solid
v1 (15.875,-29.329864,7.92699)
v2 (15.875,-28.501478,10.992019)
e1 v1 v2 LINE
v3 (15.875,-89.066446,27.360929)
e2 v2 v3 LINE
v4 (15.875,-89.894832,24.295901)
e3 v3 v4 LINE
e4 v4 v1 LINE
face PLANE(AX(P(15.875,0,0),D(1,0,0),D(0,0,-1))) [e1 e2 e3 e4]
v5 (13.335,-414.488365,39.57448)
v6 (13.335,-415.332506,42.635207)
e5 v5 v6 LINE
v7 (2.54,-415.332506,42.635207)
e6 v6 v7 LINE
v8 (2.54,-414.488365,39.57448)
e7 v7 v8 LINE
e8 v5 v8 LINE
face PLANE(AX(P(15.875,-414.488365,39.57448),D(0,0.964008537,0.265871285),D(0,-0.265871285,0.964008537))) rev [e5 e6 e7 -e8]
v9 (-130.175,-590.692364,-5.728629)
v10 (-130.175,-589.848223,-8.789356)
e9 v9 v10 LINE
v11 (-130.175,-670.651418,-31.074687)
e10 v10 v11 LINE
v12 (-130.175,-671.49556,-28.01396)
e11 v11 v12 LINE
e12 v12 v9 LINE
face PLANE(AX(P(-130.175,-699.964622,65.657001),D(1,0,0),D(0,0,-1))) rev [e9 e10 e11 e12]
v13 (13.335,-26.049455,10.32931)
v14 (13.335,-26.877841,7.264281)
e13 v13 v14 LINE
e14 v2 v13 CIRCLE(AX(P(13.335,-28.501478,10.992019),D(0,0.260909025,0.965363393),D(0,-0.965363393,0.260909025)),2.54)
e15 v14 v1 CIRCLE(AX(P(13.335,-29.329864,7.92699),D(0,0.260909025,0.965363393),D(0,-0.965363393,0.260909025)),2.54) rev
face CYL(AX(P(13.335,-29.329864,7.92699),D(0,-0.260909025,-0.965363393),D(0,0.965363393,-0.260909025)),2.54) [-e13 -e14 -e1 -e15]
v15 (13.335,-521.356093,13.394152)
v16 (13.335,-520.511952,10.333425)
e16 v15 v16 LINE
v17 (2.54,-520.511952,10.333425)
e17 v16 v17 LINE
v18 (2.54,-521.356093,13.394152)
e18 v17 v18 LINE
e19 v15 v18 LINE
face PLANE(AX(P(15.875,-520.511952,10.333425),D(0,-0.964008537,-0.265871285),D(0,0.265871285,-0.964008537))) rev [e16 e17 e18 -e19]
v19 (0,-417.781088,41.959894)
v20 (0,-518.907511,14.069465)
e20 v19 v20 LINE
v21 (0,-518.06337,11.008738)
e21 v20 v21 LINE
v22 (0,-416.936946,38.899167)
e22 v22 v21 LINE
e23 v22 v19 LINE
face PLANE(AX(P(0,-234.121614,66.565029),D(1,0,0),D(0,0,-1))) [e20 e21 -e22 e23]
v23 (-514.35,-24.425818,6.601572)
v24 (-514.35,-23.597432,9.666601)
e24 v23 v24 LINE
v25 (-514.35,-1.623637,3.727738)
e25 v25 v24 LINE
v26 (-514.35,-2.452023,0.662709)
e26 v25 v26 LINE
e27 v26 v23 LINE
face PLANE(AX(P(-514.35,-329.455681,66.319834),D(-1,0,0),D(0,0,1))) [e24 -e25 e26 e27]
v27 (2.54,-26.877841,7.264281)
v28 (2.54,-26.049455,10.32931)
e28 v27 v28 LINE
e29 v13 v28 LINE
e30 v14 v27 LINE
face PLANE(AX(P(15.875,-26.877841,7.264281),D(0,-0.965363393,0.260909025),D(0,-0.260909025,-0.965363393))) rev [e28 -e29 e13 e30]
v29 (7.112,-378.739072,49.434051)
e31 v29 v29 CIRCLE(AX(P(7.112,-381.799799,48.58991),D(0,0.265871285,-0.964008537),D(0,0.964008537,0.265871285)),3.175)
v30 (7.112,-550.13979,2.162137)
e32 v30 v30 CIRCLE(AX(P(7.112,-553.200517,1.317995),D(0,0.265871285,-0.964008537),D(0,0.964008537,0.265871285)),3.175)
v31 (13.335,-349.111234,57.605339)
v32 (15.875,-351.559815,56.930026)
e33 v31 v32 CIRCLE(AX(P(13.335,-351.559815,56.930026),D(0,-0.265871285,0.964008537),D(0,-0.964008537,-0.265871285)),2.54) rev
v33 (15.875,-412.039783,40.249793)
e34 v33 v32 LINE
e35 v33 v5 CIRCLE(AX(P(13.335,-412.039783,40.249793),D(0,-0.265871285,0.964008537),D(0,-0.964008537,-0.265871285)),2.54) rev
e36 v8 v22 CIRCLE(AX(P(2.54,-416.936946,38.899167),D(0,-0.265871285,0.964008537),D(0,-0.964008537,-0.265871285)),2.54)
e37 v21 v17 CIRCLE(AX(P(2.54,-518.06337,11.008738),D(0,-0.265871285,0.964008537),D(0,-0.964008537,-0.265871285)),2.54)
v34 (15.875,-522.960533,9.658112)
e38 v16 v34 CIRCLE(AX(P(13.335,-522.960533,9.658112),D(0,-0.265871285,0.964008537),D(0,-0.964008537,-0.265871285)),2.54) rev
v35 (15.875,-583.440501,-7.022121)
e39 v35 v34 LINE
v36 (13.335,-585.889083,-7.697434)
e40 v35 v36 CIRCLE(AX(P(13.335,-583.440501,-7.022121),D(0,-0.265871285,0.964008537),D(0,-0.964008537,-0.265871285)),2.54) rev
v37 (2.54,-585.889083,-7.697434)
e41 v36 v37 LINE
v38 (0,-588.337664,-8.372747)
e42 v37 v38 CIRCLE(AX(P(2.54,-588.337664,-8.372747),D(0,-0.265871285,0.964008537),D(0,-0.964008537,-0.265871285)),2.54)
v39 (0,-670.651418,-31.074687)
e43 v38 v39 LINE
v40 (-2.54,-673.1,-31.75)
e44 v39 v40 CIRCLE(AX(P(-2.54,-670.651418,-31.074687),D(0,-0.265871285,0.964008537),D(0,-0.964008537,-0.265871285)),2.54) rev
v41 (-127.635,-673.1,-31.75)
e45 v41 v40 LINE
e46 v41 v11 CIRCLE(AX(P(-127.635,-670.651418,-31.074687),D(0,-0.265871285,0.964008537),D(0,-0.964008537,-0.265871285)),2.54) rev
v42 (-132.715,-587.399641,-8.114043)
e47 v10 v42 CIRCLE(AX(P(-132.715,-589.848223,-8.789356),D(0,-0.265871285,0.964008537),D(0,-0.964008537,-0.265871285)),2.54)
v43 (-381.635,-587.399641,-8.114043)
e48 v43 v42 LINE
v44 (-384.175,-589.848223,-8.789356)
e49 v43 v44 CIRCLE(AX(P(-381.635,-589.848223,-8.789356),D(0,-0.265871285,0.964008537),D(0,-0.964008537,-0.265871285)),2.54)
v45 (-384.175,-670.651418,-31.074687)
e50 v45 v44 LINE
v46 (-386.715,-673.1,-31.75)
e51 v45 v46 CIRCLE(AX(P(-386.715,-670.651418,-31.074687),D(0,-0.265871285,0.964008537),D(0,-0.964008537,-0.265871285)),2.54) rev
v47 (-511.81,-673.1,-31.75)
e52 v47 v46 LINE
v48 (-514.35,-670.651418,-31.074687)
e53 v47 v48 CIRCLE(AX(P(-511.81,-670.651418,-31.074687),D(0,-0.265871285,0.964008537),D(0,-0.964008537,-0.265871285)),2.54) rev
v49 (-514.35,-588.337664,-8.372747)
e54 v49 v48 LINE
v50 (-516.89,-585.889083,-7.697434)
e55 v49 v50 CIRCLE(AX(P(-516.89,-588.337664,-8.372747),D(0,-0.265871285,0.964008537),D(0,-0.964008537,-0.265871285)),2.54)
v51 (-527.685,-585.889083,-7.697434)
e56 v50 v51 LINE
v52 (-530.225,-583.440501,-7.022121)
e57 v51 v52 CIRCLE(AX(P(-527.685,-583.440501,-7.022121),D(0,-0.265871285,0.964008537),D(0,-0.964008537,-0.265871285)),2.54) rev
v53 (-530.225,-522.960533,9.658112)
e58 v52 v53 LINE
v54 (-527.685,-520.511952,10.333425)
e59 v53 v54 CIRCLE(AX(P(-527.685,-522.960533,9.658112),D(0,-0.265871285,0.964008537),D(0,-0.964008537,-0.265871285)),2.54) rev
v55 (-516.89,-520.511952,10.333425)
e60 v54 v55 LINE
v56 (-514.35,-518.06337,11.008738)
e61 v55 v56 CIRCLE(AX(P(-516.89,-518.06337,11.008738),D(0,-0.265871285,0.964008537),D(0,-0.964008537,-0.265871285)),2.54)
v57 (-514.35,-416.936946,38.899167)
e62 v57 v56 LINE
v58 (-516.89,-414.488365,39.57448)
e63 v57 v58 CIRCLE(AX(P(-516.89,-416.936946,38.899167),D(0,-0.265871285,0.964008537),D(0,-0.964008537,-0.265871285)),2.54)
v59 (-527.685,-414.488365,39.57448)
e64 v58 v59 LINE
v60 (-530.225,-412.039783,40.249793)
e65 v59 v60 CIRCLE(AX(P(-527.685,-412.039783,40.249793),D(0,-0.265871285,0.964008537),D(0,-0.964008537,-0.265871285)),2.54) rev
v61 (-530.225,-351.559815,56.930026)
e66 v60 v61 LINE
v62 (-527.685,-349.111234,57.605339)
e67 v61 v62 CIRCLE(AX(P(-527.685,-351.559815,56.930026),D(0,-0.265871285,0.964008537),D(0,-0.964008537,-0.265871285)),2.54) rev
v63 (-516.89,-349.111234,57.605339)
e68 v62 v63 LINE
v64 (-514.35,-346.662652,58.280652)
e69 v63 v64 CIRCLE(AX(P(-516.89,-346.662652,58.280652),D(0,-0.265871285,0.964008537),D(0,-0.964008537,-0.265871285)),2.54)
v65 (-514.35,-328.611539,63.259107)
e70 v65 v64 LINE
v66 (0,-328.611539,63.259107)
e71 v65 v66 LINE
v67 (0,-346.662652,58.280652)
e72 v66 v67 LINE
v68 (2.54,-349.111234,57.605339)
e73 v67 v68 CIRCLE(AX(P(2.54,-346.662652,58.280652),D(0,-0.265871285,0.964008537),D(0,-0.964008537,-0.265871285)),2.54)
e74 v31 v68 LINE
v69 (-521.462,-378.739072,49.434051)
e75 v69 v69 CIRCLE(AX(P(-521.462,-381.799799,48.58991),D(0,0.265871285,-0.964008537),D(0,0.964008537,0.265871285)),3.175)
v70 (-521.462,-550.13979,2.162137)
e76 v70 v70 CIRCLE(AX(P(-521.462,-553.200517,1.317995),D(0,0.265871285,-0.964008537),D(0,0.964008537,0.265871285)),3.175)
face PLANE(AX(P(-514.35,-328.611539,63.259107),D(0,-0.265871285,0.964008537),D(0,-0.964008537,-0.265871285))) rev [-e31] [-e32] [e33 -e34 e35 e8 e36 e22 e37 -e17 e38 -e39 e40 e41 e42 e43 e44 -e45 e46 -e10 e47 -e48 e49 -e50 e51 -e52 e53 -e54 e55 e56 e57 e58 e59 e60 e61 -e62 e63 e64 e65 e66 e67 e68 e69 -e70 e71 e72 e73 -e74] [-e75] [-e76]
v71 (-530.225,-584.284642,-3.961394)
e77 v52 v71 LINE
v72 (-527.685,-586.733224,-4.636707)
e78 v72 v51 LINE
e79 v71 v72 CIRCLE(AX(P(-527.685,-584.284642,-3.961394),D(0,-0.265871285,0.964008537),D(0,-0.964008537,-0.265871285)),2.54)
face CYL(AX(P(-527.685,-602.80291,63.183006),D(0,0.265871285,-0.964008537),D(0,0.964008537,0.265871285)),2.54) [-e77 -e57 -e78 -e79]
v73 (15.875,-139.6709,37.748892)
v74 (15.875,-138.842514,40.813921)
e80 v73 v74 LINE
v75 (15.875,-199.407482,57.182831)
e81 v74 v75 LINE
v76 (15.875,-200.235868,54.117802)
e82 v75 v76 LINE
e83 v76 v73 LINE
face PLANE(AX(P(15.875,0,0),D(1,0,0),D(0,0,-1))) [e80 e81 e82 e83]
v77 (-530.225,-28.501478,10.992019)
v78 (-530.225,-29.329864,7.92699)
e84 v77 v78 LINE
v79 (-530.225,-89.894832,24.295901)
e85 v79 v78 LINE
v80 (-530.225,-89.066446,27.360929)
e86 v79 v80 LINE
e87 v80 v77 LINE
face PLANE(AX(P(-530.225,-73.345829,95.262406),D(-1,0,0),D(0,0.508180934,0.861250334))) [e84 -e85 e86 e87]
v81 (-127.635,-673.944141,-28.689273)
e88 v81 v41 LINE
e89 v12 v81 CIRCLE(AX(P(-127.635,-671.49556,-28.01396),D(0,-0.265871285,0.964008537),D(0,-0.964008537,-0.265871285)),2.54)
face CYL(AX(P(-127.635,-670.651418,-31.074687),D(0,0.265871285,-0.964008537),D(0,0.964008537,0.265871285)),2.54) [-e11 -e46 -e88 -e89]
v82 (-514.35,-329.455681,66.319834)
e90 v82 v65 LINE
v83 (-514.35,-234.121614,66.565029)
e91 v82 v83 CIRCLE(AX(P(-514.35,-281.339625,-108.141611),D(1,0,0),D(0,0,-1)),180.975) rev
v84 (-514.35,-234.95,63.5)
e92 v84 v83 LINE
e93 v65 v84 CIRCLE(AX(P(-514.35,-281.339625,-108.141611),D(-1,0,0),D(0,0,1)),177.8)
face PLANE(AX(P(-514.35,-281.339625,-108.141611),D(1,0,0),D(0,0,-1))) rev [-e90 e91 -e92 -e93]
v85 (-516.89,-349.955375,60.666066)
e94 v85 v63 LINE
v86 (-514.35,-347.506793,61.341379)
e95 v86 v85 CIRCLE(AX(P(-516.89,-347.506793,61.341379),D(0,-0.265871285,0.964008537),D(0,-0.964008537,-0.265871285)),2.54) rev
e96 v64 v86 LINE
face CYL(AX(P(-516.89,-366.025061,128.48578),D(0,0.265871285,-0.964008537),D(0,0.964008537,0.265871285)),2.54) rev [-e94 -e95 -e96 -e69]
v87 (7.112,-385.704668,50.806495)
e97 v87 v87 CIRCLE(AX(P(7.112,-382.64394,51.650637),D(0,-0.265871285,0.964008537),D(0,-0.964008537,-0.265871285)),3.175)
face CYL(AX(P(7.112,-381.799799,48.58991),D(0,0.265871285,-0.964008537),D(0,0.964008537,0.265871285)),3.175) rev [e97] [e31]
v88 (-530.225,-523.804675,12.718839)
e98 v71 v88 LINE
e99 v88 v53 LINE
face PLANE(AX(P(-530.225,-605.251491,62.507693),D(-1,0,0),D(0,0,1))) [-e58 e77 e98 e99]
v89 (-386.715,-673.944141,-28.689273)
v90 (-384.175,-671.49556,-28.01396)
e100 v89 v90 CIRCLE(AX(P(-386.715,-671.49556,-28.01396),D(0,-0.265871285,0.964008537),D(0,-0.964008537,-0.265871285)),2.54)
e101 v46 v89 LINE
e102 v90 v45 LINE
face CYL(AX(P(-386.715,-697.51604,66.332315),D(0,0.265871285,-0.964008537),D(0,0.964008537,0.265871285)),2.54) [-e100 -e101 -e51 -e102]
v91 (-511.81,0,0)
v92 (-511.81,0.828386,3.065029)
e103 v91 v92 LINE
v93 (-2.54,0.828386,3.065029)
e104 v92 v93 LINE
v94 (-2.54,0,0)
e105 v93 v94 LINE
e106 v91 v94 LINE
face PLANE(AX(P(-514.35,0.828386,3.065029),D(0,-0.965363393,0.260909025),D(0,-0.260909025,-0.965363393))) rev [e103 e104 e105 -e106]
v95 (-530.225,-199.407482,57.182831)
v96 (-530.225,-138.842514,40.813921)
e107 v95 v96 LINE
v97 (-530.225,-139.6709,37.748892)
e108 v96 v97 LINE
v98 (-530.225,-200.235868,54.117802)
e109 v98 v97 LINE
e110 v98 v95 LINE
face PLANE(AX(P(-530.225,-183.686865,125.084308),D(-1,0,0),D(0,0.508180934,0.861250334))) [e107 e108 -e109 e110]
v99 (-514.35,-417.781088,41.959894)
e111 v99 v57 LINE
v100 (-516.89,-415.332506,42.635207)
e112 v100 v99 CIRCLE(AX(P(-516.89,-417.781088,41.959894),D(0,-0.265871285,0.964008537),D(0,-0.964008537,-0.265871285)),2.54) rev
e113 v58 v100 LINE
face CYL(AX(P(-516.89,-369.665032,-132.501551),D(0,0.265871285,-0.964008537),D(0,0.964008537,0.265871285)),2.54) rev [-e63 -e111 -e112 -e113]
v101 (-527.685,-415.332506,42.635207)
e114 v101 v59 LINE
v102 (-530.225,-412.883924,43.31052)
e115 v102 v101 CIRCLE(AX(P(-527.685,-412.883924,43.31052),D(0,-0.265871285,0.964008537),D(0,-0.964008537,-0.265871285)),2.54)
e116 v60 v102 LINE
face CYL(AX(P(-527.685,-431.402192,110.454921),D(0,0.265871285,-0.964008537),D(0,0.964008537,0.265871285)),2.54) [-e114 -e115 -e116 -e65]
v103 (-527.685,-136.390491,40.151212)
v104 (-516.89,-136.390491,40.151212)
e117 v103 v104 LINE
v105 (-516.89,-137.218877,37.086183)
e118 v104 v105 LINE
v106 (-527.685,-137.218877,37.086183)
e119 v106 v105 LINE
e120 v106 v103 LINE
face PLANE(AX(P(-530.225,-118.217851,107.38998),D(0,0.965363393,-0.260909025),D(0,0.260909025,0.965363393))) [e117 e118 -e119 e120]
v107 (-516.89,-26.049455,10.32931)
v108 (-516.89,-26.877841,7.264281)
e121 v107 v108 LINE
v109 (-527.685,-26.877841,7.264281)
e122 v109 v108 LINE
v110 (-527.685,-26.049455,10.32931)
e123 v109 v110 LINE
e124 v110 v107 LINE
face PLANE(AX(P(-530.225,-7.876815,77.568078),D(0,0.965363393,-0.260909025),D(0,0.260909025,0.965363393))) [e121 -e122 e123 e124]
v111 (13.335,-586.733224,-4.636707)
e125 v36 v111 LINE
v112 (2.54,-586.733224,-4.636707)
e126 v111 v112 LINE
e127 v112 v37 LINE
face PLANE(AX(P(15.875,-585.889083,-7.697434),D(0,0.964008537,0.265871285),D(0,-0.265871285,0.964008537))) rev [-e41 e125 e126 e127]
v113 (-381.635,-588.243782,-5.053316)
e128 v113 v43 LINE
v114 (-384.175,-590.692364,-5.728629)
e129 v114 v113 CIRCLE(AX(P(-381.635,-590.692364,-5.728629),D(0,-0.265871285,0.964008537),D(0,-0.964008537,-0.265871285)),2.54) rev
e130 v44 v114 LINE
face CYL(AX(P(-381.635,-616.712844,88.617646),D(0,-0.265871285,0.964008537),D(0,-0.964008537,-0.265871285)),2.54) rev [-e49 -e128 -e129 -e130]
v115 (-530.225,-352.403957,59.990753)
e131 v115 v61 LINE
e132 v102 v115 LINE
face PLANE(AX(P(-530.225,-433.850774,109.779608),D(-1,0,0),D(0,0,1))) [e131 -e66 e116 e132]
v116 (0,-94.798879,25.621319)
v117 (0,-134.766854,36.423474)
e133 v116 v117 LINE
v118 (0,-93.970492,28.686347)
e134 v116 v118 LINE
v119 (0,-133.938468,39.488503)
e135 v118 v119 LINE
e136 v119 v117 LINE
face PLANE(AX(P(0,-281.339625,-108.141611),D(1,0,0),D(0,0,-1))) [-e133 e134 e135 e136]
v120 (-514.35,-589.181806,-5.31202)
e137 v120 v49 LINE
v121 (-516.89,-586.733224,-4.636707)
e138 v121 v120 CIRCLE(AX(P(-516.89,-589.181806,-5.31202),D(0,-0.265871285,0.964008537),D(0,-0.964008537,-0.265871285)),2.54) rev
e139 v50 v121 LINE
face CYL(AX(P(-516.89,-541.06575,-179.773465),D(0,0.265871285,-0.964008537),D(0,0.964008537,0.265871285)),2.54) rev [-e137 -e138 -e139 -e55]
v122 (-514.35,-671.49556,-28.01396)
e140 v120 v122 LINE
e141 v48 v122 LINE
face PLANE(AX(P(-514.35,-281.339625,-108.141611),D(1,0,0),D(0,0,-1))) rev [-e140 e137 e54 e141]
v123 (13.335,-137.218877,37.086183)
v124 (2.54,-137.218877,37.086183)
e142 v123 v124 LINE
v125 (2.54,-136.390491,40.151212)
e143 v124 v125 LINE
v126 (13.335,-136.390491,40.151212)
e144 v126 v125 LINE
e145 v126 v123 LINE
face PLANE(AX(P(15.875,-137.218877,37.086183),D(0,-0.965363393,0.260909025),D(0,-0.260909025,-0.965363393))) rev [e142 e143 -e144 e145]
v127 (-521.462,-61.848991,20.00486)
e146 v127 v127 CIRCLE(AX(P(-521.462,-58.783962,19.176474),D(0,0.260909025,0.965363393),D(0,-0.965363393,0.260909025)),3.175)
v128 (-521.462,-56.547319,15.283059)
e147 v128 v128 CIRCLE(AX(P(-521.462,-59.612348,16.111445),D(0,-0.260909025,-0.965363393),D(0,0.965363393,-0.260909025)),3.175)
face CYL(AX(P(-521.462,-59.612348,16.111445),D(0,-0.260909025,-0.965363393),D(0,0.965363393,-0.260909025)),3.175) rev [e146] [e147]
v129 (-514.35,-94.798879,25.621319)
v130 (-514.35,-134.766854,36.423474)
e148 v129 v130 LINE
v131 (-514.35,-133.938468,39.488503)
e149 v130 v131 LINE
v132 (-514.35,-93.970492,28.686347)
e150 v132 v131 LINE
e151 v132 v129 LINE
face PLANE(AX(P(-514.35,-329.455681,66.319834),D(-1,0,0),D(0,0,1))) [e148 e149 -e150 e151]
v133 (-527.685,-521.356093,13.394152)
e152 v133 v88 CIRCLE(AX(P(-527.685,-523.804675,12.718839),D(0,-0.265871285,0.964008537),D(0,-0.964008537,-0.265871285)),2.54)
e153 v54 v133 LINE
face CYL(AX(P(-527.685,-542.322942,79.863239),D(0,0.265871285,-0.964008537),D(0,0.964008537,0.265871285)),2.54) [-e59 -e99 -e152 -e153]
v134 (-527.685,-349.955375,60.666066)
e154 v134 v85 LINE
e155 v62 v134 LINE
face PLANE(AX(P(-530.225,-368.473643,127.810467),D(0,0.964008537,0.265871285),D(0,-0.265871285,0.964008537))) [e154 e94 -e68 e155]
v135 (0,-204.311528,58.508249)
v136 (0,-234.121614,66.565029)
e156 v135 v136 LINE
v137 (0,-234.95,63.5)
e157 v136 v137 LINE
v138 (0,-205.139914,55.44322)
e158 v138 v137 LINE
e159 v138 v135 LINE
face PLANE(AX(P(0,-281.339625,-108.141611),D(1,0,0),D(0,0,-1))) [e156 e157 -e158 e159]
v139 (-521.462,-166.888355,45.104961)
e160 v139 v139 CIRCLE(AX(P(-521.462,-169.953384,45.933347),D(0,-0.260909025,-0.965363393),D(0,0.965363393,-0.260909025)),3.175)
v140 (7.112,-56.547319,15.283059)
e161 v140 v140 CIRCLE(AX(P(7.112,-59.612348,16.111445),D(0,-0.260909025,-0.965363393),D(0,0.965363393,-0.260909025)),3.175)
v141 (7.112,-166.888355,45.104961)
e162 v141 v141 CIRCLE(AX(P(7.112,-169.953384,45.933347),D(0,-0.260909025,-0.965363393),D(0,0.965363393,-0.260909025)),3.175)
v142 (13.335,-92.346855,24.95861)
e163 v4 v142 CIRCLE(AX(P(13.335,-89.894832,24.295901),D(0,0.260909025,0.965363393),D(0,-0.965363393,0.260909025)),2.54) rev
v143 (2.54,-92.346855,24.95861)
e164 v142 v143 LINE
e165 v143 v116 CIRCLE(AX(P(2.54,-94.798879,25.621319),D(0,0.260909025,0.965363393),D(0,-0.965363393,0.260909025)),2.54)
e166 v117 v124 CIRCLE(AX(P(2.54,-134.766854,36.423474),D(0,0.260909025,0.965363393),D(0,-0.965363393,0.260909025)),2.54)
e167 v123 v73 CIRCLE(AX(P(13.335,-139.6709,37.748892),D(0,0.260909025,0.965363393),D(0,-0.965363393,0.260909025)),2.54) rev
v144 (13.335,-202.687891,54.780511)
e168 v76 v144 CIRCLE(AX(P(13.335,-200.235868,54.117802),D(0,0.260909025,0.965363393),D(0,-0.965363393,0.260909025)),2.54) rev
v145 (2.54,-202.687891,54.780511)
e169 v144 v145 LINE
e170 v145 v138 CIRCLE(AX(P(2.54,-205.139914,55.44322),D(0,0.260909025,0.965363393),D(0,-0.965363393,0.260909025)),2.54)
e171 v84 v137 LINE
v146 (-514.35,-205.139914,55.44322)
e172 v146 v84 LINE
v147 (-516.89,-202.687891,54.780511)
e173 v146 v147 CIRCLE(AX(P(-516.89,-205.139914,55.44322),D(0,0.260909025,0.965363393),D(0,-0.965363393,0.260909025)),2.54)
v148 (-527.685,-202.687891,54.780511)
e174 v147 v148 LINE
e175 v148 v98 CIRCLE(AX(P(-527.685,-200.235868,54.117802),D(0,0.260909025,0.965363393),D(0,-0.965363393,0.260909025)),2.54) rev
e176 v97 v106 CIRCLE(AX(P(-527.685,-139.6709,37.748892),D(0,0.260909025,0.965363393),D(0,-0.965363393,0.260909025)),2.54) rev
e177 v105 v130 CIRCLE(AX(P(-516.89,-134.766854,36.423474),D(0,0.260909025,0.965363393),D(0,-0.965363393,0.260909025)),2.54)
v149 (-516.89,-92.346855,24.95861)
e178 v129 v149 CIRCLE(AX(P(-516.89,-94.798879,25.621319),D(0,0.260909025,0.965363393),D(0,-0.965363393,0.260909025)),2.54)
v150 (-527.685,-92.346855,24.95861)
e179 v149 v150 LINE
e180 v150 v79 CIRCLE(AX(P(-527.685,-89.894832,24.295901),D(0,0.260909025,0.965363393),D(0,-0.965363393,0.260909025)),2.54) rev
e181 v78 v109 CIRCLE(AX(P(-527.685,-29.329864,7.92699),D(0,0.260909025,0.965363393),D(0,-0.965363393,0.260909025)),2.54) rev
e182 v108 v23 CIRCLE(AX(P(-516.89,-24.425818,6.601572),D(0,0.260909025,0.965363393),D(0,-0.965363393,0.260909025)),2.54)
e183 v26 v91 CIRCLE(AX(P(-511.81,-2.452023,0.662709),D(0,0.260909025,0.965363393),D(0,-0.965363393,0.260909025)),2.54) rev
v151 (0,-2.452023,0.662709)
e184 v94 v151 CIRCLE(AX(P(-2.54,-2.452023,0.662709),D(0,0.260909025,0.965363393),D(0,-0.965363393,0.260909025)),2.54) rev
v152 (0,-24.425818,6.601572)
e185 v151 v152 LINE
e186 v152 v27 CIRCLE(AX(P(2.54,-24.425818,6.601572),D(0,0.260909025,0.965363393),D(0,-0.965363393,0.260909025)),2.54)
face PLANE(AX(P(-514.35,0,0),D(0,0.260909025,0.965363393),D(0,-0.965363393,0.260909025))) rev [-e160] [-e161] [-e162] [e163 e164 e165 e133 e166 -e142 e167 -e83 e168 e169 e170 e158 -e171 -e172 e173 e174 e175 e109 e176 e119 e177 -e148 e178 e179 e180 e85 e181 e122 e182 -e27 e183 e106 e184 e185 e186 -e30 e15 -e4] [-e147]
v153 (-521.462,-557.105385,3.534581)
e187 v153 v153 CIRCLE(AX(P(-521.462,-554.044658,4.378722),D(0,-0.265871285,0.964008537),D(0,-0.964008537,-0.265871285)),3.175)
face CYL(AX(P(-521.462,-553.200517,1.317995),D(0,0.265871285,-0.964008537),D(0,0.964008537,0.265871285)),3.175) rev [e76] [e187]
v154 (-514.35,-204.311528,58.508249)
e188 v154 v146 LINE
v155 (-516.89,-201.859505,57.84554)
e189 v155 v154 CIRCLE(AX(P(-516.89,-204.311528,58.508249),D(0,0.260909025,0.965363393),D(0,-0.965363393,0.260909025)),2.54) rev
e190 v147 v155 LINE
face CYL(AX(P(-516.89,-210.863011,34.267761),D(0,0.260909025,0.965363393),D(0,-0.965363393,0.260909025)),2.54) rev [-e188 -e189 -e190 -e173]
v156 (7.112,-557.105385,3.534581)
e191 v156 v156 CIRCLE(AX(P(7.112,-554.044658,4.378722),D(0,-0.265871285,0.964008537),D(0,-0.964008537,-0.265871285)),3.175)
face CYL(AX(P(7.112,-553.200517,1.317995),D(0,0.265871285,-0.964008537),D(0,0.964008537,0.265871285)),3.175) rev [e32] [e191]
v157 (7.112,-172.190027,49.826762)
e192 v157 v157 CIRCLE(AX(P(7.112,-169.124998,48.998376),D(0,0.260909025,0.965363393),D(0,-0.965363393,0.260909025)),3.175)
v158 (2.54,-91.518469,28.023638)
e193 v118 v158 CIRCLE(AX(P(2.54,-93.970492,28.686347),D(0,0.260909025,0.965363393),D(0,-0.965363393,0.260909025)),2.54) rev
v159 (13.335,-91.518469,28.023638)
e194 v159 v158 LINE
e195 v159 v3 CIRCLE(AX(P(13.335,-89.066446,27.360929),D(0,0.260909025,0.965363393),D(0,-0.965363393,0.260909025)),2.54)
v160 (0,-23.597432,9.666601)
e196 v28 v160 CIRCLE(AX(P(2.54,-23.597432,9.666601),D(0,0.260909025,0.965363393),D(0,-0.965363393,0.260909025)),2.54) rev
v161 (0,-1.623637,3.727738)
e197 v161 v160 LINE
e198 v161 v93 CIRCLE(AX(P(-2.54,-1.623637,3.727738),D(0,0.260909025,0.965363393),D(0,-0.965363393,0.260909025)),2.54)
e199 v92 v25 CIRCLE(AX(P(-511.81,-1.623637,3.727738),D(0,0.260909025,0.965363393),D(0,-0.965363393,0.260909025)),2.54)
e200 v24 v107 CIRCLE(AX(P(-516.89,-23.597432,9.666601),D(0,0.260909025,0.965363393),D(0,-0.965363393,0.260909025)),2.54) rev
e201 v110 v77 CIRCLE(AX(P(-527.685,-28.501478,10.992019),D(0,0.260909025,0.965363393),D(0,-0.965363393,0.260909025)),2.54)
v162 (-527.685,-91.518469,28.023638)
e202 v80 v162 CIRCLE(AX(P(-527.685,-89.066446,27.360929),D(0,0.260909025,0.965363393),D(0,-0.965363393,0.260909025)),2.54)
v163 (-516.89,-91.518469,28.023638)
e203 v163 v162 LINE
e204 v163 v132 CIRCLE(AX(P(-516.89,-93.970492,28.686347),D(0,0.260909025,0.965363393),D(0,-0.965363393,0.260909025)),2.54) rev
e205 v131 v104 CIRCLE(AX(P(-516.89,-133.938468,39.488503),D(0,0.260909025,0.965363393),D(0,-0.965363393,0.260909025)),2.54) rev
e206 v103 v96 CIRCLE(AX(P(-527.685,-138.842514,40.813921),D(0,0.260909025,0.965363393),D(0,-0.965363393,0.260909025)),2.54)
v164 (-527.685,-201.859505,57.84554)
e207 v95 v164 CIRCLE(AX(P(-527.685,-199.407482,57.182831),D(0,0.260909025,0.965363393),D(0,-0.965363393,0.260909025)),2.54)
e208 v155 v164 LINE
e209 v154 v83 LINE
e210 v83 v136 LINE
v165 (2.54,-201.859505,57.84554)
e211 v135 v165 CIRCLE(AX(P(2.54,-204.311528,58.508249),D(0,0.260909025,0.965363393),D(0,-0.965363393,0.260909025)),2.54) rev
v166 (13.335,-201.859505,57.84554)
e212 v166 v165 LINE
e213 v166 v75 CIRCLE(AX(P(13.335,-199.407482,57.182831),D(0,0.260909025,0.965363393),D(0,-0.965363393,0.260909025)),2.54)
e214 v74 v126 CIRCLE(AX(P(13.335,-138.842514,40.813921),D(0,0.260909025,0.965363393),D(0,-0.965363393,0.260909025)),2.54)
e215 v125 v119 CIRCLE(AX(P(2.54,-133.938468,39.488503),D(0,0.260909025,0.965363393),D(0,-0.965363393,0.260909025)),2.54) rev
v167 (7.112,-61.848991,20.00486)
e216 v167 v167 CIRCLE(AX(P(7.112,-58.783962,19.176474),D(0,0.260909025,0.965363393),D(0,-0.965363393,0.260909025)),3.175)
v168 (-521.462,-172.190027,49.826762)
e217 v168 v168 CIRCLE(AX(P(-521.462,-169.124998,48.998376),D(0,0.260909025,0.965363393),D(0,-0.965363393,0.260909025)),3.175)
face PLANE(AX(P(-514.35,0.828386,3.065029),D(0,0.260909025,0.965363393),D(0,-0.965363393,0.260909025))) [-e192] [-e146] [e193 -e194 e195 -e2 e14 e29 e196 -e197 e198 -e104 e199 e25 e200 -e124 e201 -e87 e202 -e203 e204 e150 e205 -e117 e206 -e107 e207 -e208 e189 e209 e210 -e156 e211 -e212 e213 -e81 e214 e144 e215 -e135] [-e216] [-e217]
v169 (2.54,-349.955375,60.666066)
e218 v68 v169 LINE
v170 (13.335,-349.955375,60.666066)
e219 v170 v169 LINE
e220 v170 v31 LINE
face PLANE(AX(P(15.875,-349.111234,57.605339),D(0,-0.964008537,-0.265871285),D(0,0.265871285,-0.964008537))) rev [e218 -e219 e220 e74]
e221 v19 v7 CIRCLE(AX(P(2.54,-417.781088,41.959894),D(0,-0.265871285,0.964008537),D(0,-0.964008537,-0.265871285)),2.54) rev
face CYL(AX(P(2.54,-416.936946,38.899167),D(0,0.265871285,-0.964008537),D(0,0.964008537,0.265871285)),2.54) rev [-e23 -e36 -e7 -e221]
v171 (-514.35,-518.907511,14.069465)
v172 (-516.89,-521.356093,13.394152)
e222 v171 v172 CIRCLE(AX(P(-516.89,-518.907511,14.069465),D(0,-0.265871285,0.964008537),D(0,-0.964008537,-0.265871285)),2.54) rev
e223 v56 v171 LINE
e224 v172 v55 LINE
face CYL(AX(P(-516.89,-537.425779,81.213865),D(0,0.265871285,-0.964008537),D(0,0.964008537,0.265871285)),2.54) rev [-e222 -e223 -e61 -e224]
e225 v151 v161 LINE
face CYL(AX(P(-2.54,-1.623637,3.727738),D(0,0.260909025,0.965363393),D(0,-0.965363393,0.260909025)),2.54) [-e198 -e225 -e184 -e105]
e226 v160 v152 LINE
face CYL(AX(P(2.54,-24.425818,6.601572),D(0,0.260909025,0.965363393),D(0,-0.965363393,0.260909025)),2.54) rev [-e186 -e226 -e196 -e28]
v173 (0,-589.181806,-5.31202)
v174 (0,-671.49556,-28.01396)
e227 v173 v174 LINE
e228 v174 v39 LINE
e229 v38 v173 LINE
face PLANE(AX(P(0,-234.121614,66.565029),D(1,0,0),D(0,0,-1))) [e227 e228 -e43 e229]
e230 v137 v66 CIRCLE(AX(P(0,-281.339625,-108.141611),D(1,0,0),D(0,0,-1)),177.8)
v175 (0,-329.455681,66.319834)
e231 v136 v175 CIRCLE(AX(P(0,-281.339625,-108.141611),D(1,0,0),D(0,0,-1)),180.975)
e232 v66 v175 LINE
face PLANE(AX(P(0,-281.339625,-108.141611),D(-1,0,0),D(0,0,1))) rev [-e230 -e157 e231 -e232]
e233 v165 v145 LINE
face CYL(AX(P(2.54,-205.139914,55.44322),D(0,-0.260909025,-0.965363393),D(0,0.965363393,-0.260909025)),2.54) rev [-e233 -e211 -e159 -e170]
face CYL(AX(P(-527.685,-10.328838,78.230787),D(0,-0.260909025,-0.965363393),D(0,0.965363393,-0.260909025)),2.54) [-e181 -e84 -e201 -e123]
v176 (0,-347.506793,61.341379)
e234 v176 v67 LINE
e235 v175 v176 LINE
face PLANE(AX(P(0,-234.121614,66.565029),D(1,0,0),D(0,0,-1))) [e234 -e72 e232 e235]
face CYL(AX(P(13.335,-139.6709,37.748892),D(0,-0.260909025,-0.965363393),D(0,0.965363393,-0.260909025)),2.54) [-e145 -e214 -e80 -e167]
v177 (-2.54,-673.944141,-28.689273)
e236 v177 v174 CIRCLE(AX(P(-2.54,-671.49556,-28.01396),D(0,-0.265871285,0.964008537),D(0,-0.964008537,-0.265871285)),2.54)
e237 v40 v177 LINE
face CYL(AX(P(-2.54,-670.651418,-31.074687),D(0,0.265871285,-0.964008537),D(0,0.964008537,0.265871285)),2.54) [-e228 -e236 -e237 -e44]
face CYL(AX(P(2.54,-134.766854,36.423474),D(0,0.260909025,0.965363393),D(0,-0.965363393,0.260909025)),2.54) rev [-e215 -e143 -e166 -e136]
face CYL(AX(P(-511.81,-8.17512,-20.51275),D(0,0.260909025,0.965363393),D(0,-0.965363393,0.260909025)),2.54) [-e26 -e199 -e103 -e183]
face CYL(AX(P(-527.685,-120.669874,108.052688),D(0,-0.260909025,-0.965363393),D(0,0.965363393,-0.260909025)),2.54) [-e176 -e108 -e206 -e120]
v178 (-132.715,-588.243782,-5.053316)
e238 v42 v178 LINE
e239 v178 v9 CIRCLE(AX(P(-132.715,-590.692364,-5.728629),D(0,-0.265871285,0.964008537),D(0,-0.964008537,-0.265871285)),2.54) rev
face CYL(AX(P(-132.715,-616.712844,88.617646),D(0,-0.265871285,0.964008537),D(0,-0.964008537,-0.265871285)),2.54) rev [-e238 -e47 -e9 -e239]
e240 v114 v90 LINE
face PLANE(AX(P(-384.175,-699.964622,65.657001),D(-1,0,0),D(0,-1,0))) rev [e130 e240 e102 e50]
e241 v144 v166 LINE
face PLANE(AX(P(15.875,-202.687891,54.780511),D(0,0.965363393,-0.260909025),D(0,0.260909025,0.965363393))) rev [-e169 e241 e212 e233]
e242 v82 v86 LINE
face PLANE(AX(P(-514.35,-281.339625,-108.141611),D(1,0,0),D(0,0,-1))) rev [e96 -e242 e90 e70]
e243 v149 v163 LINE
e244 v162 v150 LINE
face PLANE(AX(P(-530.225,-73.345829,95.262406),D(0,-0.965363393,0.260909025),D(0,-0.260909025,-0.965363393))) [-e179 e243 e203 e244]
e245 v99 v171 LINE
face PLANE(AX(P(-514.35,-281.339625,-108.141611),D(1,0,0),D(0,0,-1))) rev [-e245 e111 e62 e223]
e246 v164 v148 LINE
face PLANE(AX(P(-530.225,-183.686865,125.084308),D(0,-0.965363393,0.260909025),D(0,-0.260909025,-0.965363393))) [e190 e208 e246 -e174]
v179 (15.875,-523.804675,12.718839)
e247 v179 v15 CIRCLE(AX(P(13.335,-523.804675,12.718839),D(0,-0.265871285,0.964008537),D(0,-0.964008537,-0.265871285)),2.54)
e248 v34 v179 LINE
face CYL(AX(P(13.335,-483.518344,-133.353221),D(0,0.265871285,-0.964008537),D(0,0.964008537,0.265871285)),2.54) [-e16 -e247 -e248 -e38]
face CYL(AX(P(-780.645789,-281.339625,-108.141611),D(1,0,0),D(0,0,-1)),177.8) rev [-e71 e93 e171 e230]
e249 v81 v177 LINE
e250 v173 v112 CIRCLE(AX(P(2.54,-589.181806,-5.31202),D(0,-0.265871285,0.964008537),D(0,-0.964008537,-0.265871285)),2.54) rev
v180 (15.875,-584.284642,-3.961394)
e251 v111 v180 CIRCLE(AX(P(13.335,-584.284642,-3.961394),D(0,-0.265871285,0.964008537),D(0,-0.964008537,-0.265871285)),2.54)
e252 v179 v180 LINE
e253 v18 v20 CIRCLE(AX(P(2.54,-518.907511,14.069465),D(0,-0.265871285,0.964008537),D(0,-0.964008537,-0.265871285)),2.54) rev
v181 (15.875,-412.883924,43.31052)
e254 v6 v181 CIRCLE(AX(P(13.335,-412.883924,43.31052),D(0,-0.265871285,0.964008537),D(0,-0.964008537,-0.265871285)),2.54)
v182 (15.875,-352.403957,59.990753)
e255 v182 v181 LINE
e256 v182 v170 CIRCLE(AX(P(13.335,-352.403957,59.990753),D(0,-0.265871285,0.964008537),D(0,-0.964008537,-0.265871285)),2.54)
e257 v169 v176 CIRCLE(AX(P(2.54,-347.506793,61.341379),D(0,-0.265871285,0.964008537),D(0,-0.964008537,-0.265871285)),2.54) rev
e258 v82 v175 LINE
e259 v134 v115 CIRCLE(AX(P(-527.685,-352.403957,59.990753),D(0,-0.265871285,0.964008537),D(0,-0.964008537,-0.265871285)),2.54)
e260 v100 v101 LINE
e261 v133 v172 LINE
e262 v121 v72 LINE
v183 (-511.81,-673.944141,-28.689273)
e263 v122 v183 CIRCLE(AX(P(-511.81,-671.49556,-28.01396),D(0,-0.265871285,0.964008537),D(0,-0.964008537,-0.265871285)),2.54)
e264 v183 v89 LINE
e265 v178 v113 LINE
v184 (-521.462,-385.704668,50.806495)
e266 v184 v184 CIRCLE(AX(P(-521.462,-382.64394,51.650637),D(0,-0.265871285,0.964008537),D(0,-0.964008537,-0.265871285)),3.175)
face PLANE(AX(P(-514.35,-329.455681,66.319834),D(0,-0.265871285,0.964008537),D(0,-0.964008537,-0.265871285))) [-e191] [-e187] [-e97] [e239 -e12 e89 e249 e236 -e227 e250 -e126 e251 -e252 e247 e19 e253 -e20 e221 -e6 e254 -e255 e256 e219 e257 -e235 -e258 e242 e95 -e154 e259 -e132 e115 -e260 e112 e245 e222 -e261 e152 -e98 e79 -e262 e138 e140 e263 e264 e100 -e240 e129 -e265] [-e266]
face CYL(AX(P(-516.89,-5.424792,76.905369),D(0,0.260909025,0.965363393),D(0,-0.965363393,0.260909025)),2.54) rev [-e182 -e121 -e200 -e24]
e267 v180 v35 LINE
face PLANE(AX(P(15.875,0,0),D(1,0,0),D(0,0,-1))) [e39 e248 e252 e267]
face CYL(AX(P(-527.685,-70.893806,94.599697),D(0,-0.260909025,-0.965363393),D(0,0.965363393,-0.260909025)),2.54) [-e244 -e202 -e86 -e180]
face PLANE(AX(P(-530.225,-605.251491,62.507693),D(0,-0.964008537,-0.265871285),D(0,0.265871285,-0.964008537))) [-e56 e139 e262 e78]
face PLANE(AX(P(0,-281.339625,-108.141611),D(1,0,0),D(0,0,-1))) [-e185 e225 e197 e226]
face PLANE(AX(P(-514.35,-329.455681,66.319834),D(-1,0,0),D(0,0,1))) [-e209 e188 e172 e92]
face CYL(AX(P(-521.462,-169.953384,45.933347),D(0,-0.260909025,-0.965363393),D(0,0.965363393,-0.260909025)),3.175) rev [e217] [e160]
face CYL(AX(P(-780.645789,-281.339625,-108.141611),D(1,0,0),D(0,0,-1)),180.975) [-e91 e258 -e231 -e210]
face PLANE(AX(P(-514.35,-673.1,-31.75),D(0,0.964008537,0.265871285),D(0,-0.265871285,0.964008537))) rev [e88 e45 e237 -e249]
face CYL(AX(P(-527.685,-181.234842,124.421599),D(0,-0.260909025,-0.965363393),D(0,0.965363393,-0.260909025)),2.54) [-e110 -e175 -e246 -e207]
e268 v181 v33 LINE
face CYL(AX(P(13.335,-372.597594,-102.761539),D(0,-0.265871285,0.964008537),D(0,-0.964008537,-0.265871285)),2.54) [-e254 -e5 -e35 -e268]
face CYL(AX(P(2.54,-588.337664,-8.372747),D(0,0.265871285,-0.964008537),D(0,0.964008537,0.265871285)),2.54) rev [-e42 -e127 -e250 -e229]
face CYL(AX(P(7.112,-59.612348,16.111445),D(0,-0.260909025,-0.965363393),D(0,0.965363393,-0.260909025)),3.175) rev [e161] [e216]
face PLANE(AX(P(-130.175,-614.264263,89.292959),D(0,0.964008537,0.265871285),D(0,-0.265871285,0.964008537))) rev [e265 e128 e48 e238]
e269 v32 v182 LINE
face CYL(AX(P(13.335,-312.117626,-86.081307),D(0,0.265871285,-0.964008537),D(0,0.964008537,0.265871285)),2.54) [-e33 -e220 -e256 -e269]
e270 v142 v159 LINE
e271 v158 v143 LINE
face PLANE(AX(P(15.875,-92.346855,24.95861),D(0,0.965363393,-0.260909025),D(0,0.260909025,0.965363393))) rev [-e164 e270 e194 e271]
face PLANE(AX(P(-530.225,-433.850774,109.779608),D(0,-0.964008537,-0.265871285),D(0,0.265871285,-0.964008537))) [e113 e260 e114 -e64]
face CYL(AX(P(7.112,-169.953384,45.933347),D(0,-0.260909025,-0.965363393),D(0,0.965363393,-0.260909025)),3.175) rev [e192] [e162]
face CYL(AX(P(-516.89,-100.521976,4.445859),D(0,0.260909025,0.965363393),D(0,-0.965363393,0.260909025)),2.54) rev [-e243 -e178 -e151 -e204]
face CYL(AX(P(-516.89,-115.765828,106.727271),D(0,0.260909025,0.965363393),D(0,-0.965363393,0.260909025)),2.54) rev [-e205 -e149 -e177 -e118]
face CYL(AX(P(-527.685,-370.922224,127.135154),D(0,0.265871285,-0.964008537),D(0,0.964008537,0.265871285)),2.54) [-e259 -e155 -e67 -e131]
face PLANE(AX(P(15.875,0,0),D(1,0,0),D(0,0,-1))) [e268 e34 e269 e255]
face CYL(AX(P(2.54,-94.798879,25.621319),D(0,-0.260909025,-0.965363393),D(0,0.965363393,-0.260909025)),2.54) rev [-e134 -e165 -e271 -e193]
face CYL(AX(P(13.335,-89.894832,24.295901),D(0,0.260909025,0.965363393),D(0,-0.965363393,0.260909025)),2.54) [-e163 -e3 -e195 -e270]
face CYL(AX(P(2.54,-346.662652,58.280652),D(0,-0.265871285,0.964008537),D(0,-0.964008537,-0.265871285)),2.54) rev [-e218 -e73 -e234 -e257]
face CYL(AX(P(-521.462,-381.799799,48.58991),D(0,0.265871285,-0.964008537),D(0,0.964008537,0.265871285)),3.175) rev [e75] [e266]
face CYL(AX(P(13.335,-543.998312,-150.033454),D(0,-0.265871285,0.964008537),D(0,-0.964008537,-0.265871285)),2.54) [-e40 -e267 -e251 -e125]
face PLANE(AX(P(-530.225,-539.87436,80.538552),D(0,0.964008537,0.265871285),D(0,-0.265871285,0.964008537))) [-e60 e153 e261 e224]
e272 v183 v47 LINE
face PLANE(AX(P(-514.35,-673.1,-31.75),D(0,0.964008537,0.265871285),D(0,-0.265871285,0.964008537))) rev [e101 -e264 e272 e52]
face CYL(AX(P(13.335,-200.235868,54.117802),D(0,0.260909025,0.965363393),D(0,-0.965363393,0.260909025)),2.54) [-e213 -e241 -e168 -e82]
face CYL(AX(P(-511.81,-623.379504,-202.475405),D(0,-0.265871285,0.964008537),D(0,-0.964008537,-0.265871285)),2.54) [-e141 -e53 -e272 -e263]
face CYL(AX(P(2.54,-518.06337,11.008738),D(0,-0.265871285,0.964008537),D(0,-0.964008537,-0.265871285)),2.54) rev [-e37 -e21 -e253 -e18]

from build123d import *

# Parameters (mm, degrees)
BASE_FLANGE1_DEPTH          = 514.35
BOSS_EXTRUDE1_DEPTH         = 15.875
UNFOLD1_START               = -514.35
UNFOLD1_DEPTH               = 530.225
UNFOLD1_2_DEPTH             = 514.35
UNFOLD1_3_DEPTH             = 15.875
SKETCH10_W                  = 15.875
SKETCH10_H                  = 67.818
BOSS_EXTRUDE3_DEPTH         = 3.175
F_1_4_0_25_DIAMETER_HOLE2_D = 6.35
FOLD1_START                 = 56.527453153
FOLD1_OUTLINE_R             = 3.175
FOLD1_DEPTH                 = 21.579851663
FOLD1_START_2               = -530.225
FOLD1_2_DEPTH               = 546.1
FOLD1_START_3               = -514.35
FOLD1_3_DEPTH               = 514.35
FOLD1_START_4               = -518.287
FOLD1_4_DEPTH               = 522.2239999
FOLD1_START_5               = 10.287
FOLD1_5_DEPTH               = 5.588
FOLD1_6_DEPTH               = 5.5879999
FOLD1_7_DEPTH               = 3.175
SKETCH13_W                  = 254
SKETCH13_H                  = 88.9
CUT_EXTRUDE1_DEPTH          = 846.146615463
FILLET1_R                   = 2.54


with BuildPart() as part:
    # Base-Flange1: sheet metal written as solids
    # Sketch1 → Base-Flange1 (new body)
    with BuildSketch(Plane(origin=(0, 0, 0), x_dir=(0, 0, -1), z_dir=(1, 0, 0))):
        with BuildLine():
            Line((0, 0), (-63.5, -234.95))
            ThreePointArc((-63.5, -234.95), (-69.657800653, -281.796916986), (-63.259106615, -328.611539217))
            Line((-63.259106615, -328.611539217), (31.75, -673.1))
            Line((31.75, -673.1), (28.689272895, -673.944141331))
            Line((28.689272895, -673.944141331), (-66.31983372, -329.455680548))
            ThreePointArc((-66.31983372, -329.455680548), (-72.832790151, -281.80508292), (-66.565028773, -234.121613845))
            Line((-66.565028773, -234.121613845), (-3.065028773, 0.828386155))
            Line((-3.065028773, 0.828386155), (0, 0))
        make_face()
    extrude(amount=-BASE_FLANGE1_DEPTH)

    # Sketch6 → Boss-Extrude1 (add)
    with BuildSketch(Plane(origin=(0, 0, 0), x_dir=(0, 0, -1), z_dir=(1, 0, 0))):
        Polygon((-24.958609592, -92.346855489), (-28.023638364, -91.518469334), (-10.329310097, -26.049454745), (-7.264281324, -26.8778409), align=None)
        Polygon((-54.780511165, -202.687891312), (-57.845539938, -201.859505157), (-40.151211671, -136.390490569), (-37.086182898, -137.218876723), align=None)
        Polygon((-39.574480305, -414.488364632), (-42.635207411, -415.332505963), (-60.666066245, -349.955374995), (-57.60533914, -349.111233663), align=None)
        Polygon((7.697434241, -585.889082528), (4.636707136, -586.733223859), (-13.394151698, -521.35609289), (-10.333424593, -520.511951559), align=None)
    extrude(amount=BOSS_EXTRUDE1_DEPTH)

    # Unfold1: read off the stored shape, not the designer's step
    # Unfold1 outline → Unfold1 (cut)
    with BuildSketch(Plane.YZ.offset(UNFOLD1_START)):
        with BuildLine():
            ThreePointArc((-234.121613845, 66.565028773), (-264.853231277, 72.080888585), (-296.075563797, 72.232452052))
            Line((-296.075563797, 72.232452052), (-328.611539217, 63.259106615))
            ThreePointArc((-328.611539217, 63.259106615), (-281.796916986, 69.657800653), (-234.95, 63.5))
            Line((-234.95, 63.5), (0, 0))
            Line((0, 0), (0.828386155, 3.065028773))
            Line((0.828386155, 3.065028773), (-234.121613845, 66.565028773))
        make_face()
    extrude(amount=UNFOLD1_DEPTH, mode=Mode.SUBTRACT)

    # Unfold1 2 outline → Unfold1 2 (add)
    with BuildSketch(Plane.YZ.offset(UNFOLD1_START)):
        with BuildLine():
            Line((-1.806679071, 153.391117799), (-2.650820402, 156.451844904))
            Line((-2.650820402, 156.451844904), (-329.455680548, 66.31983372))
            ThreePointArc((-329.455680548, 66.31983372), (-312.904368973, 70.059448037), (-296.075563797, 72.232452052))
            Line((-296.075563797, 72.232452052), (-1.806679071, 153.391117799))
        make_face()
    extrude(amount=UNFOLD1_2_DEPTH)

    # Unfold1 3 outline → Unfold1 3 (add)
    with BuildSketch(Plane.YZ):
        Polygon((-28.646797801, 145.98867623), (-29.490939132, 149.049403336), (-94.868070101, 131.018544501), (-94.023928769, 127.957817396), align=None)
        Polygon((-138.832973591, 115.599588307), (-139.677114922, 118.660315413), (-205.054245891, 100.629456578), (-204.210104559, 97.568729473), align=None)
    extrude(amount=UNFOLD1_3_DEPTH)

    # Sketch10 → Boss-Extrude3 (add)
    with BuildSketch(Plane(origin=(0, -39.442188951, 143.011332762), x_dir=(-1, 0, 0), z_dir=(0, 0.26587128541416305, -0.9640085370950928))):
        with Locations((522.2875, -22.710560635)):
            Rectangle(SKETCH10_W, SKETCH10_H)
        with Locations((522.2875, -137.010560635)):
            Rectangle(SKETCH10_W, SKETCH10_H)
        with Locations((522.2875, -355.139604084)):
            Rectangle(SKETCH10_W, SKETCH10_H)
        with Locations((522.2875, -532.939604084)):
            Rectangle(SKETCH10_W, SKETCH10_H)
    extrude(amount=-BOSS_EXTRUDE3_DEPTH)

    # 1/4 (0.25) Diameter Hole2 (through all)
    with Locations(Plane(origin=(0, -39.442188951, 143.011332762), x_dir=(-1, 0, 0), z_dir=(0, 0.26587128541416305, -0.9640085370950928))):
        with Locations((-7.112, -22.710560635), (-7.112, -137.010560635), (-7.112, -355.139604084), (-7.112, -532.939604084), (521.462, -532.939604084), (521.462, -355.139604084), (521.462, -137.010560635), (521.462, -22.710560635)):
            Hole(F_1_4_0_25_DIAMETER_HOLE2_D / 2)

    # Fold1: read off the stored shape, not the designer's step
    # Fold1 outline → Fold1 (cut)
    with BuildSketch(Plane(origin=(0, 0, 0), x_dir=(1, 0, 0), z_dir=(0, 0.26090902514277503, 0.9653633930282662)).offset(FOLD1_START)):
        with Locations((-521.462, -176.051200247)):
            Circle(FOLD1_OUTLINE_R)
        with Locations((7.112, -176.051200247)):
            Circle(FOLD1_OUTLINE_R)
    extrude(amount=FOLD1_DEPTH, mode=Mode.SUBTRACT)

    # Fold1 2 outline → Fold1 2 (cut)
    with BuildSketch(Plane.YZ.offset(FOLD1_START_2)):
        with BuildLine():
            ThreePointArc((-329.455680548, 66.31983372), (-312.904368974, 70.059448037), (-296.075563798, 72.232452051))
            Line((-296.075563798, 72.232452051), (-1.806679071, 153.391117799))
            Line((-1.806679071, 153.391117799), (-2.650820402, 156.451844904))
            Line((-2.650820402, 156.451844904), (-329.455680548, 66.31983372))
        make_face()
    extrude(amount=FOLD1_2_DEPTH, mode=Mode.SUBTRACT)

    # Fold1 3 outline → Fold1 3 (add)
    with BuildSketch(Plane.YZ.offset(FOLD1_START_3)):
        with BuildLine():
            Line((0, 0), (0.828386155, 3.065028773))
            Line((0.828386155, 3.065028773), (-234.121613845, 66.565028773))
            ThreePointArc((-234.121613845, 66.565028773), (-264.853231278, 72.080888585), (-296.075563798, 72.232452051))
            Line((-296.075563798, 72.232452051), (-328.611539217, 63.259106615))
            ThreePointArc((-328.611539217, 63.259106615), (-281.796916986, 69.657800653), (-234.95, 63.5))
            Line((-234.95, 63.5), (0, 0))
        make_face()
    extrude(amount=FOLD1_3_DEPTH)

    # Fold1 4 outline → Fold1 4 (add)
    with BuildSketch(Plane.YZ.offset(FOLD1_START_4)):
        Polygon((-26.8778409, 7.264281324), (-26.049454745, 10.329310097), (-91.518469334, 28.023638365), (-92.346855489, 24.958609592), align=None)
        Polygon((-137.218876723, 37.086182898), (-136.390490569, 40.151211671), (-201.859505157, 57.845539938), (-202.687891312, 54.780511165), align=None)
    extrude(amount=FOLD1_4_DEPTH)



with BuildPart() as body_2:
    # Fold1 5 outline → Fold1 5 (new body)
    with BuildSketch(Plane.YZ.offset(FOLD1_START_5)):
        Polygon((-26.8778409, 7.264281324), (-26.049454745, 10.329310097), (-91.518469334, 28.023638365), (-92.346855489, 24.958609592), align=None)
        Polygon((-137.218876723, 37.086182898), (-136.390490569, 40.151211671), (-201.859505157, 57.845539938), (-202.687891312, 54.780511165), align=None)
    extrude(amount=FOLD1_5_DEPTH)


with BuildPart() as body_3:
    # Fold1 6 outline → Fold1 6 (new body)
    with BuildSketch(Plane.YZ.offset(FOLD1_START_2)):
        Polygon((-26.8778409, 7.264281324), (-26.049454745, 10.329310097), (-91.518469334, 28.023638365), (-92.346855489, 24.958609592), align=None)
        Polygon((-137.218876723, 37.086182898), (-136.390490569, 40.151211671), (-201.859505157, 57.845539938), (-202.687891312, 54.780511165), align=None)
    extrude(amount=FOLD1_6_DEPTH)


with BuildPart() as part_1:
    add(part.part)

    add(body_2.part)  # Fold1 7 merges body 2

    add(body_3.part)  # Fold1 7 merges body 3
    # Fold1 7 outline → Fold1 7 (add)
    with BuildSketch(Plane(origin=(0, 0, 0), x_dir=(1, 0, 0), z_dir=(0, 0.26090902514277503, 0.9653633930282662))):
        with BuildLine():
            Line((10.287, -27.842200247), (3.9369999, -27.842200247))
            Line((3.9369999, -27.842200247), (3.937, -61.751200247))
            ThreePointArc((3.937, -61.751200247), (7.112, -58.576200247), (10.287, -61.751200247))
            Line((10.287, -61.751200247), (10.287, -27.842200247))
        make_face()
        with BuildLine():
            ThreePointArc((10.287, -61.751200247), (7.112, -64.926200247), (3.937, -61.751200247))
            Line((3.937, -61.751200247), (3.9369999, -95.660200248))
            Line((3.9369999, -95.660200248), (10.287, -95.660200247))
            Line((10.287, -95.660200247), (10.287, -61.751200247))
        make_face()
        with BuildLine():
            Line((-518.287, -61.751200247), (-518.287, -27.842200247))
            Line((-518.287, -27.842200247), (-524.6370001, -27.842200247))
            Line((-524.6370001, -27.842200247), (-524.637, -61.751200247))
            ThreePointArc((-524.637, -61.751200247), (-521.462, -58.576200247), (-518.287, -61.751200247))
        make_face()
        with BuildLine():
            Line((-518.287, -95.660200248), (-518.287, -61.751200247))
            ThreePointArc((-518.287, -61.751200247), (-521.462, -64.926200247), (-524.637, -61.751200247))
            Line((-524.637, -61.751200247), (-524.6370001, -95.660200248))
            Line((-524.6370001, -95.660200248), (-518.287, -95.660200248))
        make_face()
        with BuildLine():
            Line((10.287, -142.142200247), (3.9369999, -142.142200247))
            Line((3.9369999, -142.142200247), (3.937, -176.051200247))
            ThreePointArc((3.937, -176.051200247), (7.112, -172.876200247), (10.287, -176.051200247))
            Line((10.287, -176.051200247), (10.287, -142.142200247))
        make_face()
        with BuildLine():
            ThreePointArc((10.287, -176.051200247), (7.112, -179.226200247), (3.937, -176.051200247))
            Line((3.937, -176.051200247), (3.9369999, -209.960200248))
            Line((3.9369999, -209.960200248), (10.287, -209.960200247))
            Line((10.287, -209.960200247), (10.287, -176.051200247))
        make_face()
        with BuildLine():
            Line((-518.287, -176.051200247), (-518.287, -142.142200247))
            Line((-518.287, -142.142200247), (-524.6370001, -142.142200247))
            Line((-524.6370001, -142.142200247), (-524.637, -176.051200247))
            ThreePointArc((-524.637, -176.051200247), (-521.462, -172.876200247), (-518.287, -176.051200247))
        make_face()
        with BuildLine():
            Line((-518.287, -209.960200248), (-518.287, -176.051200247))
            ThreePointArc((-518.287, -176.051200247), (-521.462, -179.226200247), (-524.637, -176.051200247))
            Line((-524.637, -176.051200247), (-524.6370001, -209.960200248))
            Line((-524.6370001, -209.960200248), (-518.287, -209.960200248))
        make_face()
    extrude(amount=FOLD1_7_DEPTH)

    # Sketch13 → Cut-Extrude1 (cut, through all)
    with BuildSketch(Plane(origin=(0, -39.442188951, 143.011332762), x_dir=(-1, 0, 0), z_dir=(0, 0.2658712854141638, -0.9640085370950925))):
        with Locations((257.175, -612.865559631)):
            Rectangle(SKETCH13_W, SKETCH13_H)
    extrude(amount=-CUT_EXTRUDE1_DEPTH, mode=Mode.SUBTRACT)

    # Fillet1
    fillet1_edges = [part_1.edges().sort_by_distance(p)[0] for p in [
        (-514.35, -26.463647823, 8.79679571),
        (-514.35, -91.932662411, 26.491123978),
        (-530.225, -91.932662412, 26.491123978),
        (-530.225, -26.463647823, 8.79679571),
        (-514.35, -136.804683646, 38.618697284),
        (-514.35, -202.273698234, 56.313025551),
        (-530.225, -202.273698234, 56.313025552),
        (-530.225, -136.804683646, 38.618697285),
        (-514.35, -349.533304329, 59.135702692),
        (-530.225, -349.533304329, 59.135702692),
        (-530.225, -414.910435298, 41.104843858),
        (-514.35, -414.910435298, 41.104843858),
        (-514.35, -520.934022224, 11.863788146),
        (-530.225, -520.934022224, 11.863788146),
        (-530.225, -586.311153193, -6.167070689),
        (-514.35, -586.311153193, -6.167070689),
        (-514.35, -673.522070666, -30.219636447),
        (0, -673.522070666, -30.219636447),
        (0, -586.311153193, -6.167070689),
        (15.875, -520.934022224, 11.863788146),
        (15.875, -586.311153193, -6.167070689),
        (0, -520.934022224, 11.863788146),
        (0, -414.910435298, 41.104843858),
        (15.875, -349.533304329, 59.135702692),
        (15.875, -414.910435298, 41.104843858),
        (0, -349.533304329, 59.135702692),
        (-514.35, 0.414193077, 1.532514386),
        (0, -26.463647823, 8.79679571),
        (0, -91.932662411, 26.491123978),
        (-130.175, -673.522070666, -30.219636447),
        (-130.175, -587.821711718, -6.583679174),
        (-384.175, -587.821711718, -6.583679174),
        (-384.175, -673.522070666, -30.219636447),
        (15.875, -26.463647823, 8.79679571),
        (15.875, -91.932662412, 26.491123978),
        (0, -136.804683646, 38.618697284),
        (0, -202.273698234, 56.313025551),
        (15.875, -136.804683646, 38.618697285),
        (15.875, -202.273698234, 56.313025552),
        (0, 0.414193077, 1.532514386),
    ]]
    fillet(fillet1_edges, radius=FILLET1_R)


solid = part_1.part
